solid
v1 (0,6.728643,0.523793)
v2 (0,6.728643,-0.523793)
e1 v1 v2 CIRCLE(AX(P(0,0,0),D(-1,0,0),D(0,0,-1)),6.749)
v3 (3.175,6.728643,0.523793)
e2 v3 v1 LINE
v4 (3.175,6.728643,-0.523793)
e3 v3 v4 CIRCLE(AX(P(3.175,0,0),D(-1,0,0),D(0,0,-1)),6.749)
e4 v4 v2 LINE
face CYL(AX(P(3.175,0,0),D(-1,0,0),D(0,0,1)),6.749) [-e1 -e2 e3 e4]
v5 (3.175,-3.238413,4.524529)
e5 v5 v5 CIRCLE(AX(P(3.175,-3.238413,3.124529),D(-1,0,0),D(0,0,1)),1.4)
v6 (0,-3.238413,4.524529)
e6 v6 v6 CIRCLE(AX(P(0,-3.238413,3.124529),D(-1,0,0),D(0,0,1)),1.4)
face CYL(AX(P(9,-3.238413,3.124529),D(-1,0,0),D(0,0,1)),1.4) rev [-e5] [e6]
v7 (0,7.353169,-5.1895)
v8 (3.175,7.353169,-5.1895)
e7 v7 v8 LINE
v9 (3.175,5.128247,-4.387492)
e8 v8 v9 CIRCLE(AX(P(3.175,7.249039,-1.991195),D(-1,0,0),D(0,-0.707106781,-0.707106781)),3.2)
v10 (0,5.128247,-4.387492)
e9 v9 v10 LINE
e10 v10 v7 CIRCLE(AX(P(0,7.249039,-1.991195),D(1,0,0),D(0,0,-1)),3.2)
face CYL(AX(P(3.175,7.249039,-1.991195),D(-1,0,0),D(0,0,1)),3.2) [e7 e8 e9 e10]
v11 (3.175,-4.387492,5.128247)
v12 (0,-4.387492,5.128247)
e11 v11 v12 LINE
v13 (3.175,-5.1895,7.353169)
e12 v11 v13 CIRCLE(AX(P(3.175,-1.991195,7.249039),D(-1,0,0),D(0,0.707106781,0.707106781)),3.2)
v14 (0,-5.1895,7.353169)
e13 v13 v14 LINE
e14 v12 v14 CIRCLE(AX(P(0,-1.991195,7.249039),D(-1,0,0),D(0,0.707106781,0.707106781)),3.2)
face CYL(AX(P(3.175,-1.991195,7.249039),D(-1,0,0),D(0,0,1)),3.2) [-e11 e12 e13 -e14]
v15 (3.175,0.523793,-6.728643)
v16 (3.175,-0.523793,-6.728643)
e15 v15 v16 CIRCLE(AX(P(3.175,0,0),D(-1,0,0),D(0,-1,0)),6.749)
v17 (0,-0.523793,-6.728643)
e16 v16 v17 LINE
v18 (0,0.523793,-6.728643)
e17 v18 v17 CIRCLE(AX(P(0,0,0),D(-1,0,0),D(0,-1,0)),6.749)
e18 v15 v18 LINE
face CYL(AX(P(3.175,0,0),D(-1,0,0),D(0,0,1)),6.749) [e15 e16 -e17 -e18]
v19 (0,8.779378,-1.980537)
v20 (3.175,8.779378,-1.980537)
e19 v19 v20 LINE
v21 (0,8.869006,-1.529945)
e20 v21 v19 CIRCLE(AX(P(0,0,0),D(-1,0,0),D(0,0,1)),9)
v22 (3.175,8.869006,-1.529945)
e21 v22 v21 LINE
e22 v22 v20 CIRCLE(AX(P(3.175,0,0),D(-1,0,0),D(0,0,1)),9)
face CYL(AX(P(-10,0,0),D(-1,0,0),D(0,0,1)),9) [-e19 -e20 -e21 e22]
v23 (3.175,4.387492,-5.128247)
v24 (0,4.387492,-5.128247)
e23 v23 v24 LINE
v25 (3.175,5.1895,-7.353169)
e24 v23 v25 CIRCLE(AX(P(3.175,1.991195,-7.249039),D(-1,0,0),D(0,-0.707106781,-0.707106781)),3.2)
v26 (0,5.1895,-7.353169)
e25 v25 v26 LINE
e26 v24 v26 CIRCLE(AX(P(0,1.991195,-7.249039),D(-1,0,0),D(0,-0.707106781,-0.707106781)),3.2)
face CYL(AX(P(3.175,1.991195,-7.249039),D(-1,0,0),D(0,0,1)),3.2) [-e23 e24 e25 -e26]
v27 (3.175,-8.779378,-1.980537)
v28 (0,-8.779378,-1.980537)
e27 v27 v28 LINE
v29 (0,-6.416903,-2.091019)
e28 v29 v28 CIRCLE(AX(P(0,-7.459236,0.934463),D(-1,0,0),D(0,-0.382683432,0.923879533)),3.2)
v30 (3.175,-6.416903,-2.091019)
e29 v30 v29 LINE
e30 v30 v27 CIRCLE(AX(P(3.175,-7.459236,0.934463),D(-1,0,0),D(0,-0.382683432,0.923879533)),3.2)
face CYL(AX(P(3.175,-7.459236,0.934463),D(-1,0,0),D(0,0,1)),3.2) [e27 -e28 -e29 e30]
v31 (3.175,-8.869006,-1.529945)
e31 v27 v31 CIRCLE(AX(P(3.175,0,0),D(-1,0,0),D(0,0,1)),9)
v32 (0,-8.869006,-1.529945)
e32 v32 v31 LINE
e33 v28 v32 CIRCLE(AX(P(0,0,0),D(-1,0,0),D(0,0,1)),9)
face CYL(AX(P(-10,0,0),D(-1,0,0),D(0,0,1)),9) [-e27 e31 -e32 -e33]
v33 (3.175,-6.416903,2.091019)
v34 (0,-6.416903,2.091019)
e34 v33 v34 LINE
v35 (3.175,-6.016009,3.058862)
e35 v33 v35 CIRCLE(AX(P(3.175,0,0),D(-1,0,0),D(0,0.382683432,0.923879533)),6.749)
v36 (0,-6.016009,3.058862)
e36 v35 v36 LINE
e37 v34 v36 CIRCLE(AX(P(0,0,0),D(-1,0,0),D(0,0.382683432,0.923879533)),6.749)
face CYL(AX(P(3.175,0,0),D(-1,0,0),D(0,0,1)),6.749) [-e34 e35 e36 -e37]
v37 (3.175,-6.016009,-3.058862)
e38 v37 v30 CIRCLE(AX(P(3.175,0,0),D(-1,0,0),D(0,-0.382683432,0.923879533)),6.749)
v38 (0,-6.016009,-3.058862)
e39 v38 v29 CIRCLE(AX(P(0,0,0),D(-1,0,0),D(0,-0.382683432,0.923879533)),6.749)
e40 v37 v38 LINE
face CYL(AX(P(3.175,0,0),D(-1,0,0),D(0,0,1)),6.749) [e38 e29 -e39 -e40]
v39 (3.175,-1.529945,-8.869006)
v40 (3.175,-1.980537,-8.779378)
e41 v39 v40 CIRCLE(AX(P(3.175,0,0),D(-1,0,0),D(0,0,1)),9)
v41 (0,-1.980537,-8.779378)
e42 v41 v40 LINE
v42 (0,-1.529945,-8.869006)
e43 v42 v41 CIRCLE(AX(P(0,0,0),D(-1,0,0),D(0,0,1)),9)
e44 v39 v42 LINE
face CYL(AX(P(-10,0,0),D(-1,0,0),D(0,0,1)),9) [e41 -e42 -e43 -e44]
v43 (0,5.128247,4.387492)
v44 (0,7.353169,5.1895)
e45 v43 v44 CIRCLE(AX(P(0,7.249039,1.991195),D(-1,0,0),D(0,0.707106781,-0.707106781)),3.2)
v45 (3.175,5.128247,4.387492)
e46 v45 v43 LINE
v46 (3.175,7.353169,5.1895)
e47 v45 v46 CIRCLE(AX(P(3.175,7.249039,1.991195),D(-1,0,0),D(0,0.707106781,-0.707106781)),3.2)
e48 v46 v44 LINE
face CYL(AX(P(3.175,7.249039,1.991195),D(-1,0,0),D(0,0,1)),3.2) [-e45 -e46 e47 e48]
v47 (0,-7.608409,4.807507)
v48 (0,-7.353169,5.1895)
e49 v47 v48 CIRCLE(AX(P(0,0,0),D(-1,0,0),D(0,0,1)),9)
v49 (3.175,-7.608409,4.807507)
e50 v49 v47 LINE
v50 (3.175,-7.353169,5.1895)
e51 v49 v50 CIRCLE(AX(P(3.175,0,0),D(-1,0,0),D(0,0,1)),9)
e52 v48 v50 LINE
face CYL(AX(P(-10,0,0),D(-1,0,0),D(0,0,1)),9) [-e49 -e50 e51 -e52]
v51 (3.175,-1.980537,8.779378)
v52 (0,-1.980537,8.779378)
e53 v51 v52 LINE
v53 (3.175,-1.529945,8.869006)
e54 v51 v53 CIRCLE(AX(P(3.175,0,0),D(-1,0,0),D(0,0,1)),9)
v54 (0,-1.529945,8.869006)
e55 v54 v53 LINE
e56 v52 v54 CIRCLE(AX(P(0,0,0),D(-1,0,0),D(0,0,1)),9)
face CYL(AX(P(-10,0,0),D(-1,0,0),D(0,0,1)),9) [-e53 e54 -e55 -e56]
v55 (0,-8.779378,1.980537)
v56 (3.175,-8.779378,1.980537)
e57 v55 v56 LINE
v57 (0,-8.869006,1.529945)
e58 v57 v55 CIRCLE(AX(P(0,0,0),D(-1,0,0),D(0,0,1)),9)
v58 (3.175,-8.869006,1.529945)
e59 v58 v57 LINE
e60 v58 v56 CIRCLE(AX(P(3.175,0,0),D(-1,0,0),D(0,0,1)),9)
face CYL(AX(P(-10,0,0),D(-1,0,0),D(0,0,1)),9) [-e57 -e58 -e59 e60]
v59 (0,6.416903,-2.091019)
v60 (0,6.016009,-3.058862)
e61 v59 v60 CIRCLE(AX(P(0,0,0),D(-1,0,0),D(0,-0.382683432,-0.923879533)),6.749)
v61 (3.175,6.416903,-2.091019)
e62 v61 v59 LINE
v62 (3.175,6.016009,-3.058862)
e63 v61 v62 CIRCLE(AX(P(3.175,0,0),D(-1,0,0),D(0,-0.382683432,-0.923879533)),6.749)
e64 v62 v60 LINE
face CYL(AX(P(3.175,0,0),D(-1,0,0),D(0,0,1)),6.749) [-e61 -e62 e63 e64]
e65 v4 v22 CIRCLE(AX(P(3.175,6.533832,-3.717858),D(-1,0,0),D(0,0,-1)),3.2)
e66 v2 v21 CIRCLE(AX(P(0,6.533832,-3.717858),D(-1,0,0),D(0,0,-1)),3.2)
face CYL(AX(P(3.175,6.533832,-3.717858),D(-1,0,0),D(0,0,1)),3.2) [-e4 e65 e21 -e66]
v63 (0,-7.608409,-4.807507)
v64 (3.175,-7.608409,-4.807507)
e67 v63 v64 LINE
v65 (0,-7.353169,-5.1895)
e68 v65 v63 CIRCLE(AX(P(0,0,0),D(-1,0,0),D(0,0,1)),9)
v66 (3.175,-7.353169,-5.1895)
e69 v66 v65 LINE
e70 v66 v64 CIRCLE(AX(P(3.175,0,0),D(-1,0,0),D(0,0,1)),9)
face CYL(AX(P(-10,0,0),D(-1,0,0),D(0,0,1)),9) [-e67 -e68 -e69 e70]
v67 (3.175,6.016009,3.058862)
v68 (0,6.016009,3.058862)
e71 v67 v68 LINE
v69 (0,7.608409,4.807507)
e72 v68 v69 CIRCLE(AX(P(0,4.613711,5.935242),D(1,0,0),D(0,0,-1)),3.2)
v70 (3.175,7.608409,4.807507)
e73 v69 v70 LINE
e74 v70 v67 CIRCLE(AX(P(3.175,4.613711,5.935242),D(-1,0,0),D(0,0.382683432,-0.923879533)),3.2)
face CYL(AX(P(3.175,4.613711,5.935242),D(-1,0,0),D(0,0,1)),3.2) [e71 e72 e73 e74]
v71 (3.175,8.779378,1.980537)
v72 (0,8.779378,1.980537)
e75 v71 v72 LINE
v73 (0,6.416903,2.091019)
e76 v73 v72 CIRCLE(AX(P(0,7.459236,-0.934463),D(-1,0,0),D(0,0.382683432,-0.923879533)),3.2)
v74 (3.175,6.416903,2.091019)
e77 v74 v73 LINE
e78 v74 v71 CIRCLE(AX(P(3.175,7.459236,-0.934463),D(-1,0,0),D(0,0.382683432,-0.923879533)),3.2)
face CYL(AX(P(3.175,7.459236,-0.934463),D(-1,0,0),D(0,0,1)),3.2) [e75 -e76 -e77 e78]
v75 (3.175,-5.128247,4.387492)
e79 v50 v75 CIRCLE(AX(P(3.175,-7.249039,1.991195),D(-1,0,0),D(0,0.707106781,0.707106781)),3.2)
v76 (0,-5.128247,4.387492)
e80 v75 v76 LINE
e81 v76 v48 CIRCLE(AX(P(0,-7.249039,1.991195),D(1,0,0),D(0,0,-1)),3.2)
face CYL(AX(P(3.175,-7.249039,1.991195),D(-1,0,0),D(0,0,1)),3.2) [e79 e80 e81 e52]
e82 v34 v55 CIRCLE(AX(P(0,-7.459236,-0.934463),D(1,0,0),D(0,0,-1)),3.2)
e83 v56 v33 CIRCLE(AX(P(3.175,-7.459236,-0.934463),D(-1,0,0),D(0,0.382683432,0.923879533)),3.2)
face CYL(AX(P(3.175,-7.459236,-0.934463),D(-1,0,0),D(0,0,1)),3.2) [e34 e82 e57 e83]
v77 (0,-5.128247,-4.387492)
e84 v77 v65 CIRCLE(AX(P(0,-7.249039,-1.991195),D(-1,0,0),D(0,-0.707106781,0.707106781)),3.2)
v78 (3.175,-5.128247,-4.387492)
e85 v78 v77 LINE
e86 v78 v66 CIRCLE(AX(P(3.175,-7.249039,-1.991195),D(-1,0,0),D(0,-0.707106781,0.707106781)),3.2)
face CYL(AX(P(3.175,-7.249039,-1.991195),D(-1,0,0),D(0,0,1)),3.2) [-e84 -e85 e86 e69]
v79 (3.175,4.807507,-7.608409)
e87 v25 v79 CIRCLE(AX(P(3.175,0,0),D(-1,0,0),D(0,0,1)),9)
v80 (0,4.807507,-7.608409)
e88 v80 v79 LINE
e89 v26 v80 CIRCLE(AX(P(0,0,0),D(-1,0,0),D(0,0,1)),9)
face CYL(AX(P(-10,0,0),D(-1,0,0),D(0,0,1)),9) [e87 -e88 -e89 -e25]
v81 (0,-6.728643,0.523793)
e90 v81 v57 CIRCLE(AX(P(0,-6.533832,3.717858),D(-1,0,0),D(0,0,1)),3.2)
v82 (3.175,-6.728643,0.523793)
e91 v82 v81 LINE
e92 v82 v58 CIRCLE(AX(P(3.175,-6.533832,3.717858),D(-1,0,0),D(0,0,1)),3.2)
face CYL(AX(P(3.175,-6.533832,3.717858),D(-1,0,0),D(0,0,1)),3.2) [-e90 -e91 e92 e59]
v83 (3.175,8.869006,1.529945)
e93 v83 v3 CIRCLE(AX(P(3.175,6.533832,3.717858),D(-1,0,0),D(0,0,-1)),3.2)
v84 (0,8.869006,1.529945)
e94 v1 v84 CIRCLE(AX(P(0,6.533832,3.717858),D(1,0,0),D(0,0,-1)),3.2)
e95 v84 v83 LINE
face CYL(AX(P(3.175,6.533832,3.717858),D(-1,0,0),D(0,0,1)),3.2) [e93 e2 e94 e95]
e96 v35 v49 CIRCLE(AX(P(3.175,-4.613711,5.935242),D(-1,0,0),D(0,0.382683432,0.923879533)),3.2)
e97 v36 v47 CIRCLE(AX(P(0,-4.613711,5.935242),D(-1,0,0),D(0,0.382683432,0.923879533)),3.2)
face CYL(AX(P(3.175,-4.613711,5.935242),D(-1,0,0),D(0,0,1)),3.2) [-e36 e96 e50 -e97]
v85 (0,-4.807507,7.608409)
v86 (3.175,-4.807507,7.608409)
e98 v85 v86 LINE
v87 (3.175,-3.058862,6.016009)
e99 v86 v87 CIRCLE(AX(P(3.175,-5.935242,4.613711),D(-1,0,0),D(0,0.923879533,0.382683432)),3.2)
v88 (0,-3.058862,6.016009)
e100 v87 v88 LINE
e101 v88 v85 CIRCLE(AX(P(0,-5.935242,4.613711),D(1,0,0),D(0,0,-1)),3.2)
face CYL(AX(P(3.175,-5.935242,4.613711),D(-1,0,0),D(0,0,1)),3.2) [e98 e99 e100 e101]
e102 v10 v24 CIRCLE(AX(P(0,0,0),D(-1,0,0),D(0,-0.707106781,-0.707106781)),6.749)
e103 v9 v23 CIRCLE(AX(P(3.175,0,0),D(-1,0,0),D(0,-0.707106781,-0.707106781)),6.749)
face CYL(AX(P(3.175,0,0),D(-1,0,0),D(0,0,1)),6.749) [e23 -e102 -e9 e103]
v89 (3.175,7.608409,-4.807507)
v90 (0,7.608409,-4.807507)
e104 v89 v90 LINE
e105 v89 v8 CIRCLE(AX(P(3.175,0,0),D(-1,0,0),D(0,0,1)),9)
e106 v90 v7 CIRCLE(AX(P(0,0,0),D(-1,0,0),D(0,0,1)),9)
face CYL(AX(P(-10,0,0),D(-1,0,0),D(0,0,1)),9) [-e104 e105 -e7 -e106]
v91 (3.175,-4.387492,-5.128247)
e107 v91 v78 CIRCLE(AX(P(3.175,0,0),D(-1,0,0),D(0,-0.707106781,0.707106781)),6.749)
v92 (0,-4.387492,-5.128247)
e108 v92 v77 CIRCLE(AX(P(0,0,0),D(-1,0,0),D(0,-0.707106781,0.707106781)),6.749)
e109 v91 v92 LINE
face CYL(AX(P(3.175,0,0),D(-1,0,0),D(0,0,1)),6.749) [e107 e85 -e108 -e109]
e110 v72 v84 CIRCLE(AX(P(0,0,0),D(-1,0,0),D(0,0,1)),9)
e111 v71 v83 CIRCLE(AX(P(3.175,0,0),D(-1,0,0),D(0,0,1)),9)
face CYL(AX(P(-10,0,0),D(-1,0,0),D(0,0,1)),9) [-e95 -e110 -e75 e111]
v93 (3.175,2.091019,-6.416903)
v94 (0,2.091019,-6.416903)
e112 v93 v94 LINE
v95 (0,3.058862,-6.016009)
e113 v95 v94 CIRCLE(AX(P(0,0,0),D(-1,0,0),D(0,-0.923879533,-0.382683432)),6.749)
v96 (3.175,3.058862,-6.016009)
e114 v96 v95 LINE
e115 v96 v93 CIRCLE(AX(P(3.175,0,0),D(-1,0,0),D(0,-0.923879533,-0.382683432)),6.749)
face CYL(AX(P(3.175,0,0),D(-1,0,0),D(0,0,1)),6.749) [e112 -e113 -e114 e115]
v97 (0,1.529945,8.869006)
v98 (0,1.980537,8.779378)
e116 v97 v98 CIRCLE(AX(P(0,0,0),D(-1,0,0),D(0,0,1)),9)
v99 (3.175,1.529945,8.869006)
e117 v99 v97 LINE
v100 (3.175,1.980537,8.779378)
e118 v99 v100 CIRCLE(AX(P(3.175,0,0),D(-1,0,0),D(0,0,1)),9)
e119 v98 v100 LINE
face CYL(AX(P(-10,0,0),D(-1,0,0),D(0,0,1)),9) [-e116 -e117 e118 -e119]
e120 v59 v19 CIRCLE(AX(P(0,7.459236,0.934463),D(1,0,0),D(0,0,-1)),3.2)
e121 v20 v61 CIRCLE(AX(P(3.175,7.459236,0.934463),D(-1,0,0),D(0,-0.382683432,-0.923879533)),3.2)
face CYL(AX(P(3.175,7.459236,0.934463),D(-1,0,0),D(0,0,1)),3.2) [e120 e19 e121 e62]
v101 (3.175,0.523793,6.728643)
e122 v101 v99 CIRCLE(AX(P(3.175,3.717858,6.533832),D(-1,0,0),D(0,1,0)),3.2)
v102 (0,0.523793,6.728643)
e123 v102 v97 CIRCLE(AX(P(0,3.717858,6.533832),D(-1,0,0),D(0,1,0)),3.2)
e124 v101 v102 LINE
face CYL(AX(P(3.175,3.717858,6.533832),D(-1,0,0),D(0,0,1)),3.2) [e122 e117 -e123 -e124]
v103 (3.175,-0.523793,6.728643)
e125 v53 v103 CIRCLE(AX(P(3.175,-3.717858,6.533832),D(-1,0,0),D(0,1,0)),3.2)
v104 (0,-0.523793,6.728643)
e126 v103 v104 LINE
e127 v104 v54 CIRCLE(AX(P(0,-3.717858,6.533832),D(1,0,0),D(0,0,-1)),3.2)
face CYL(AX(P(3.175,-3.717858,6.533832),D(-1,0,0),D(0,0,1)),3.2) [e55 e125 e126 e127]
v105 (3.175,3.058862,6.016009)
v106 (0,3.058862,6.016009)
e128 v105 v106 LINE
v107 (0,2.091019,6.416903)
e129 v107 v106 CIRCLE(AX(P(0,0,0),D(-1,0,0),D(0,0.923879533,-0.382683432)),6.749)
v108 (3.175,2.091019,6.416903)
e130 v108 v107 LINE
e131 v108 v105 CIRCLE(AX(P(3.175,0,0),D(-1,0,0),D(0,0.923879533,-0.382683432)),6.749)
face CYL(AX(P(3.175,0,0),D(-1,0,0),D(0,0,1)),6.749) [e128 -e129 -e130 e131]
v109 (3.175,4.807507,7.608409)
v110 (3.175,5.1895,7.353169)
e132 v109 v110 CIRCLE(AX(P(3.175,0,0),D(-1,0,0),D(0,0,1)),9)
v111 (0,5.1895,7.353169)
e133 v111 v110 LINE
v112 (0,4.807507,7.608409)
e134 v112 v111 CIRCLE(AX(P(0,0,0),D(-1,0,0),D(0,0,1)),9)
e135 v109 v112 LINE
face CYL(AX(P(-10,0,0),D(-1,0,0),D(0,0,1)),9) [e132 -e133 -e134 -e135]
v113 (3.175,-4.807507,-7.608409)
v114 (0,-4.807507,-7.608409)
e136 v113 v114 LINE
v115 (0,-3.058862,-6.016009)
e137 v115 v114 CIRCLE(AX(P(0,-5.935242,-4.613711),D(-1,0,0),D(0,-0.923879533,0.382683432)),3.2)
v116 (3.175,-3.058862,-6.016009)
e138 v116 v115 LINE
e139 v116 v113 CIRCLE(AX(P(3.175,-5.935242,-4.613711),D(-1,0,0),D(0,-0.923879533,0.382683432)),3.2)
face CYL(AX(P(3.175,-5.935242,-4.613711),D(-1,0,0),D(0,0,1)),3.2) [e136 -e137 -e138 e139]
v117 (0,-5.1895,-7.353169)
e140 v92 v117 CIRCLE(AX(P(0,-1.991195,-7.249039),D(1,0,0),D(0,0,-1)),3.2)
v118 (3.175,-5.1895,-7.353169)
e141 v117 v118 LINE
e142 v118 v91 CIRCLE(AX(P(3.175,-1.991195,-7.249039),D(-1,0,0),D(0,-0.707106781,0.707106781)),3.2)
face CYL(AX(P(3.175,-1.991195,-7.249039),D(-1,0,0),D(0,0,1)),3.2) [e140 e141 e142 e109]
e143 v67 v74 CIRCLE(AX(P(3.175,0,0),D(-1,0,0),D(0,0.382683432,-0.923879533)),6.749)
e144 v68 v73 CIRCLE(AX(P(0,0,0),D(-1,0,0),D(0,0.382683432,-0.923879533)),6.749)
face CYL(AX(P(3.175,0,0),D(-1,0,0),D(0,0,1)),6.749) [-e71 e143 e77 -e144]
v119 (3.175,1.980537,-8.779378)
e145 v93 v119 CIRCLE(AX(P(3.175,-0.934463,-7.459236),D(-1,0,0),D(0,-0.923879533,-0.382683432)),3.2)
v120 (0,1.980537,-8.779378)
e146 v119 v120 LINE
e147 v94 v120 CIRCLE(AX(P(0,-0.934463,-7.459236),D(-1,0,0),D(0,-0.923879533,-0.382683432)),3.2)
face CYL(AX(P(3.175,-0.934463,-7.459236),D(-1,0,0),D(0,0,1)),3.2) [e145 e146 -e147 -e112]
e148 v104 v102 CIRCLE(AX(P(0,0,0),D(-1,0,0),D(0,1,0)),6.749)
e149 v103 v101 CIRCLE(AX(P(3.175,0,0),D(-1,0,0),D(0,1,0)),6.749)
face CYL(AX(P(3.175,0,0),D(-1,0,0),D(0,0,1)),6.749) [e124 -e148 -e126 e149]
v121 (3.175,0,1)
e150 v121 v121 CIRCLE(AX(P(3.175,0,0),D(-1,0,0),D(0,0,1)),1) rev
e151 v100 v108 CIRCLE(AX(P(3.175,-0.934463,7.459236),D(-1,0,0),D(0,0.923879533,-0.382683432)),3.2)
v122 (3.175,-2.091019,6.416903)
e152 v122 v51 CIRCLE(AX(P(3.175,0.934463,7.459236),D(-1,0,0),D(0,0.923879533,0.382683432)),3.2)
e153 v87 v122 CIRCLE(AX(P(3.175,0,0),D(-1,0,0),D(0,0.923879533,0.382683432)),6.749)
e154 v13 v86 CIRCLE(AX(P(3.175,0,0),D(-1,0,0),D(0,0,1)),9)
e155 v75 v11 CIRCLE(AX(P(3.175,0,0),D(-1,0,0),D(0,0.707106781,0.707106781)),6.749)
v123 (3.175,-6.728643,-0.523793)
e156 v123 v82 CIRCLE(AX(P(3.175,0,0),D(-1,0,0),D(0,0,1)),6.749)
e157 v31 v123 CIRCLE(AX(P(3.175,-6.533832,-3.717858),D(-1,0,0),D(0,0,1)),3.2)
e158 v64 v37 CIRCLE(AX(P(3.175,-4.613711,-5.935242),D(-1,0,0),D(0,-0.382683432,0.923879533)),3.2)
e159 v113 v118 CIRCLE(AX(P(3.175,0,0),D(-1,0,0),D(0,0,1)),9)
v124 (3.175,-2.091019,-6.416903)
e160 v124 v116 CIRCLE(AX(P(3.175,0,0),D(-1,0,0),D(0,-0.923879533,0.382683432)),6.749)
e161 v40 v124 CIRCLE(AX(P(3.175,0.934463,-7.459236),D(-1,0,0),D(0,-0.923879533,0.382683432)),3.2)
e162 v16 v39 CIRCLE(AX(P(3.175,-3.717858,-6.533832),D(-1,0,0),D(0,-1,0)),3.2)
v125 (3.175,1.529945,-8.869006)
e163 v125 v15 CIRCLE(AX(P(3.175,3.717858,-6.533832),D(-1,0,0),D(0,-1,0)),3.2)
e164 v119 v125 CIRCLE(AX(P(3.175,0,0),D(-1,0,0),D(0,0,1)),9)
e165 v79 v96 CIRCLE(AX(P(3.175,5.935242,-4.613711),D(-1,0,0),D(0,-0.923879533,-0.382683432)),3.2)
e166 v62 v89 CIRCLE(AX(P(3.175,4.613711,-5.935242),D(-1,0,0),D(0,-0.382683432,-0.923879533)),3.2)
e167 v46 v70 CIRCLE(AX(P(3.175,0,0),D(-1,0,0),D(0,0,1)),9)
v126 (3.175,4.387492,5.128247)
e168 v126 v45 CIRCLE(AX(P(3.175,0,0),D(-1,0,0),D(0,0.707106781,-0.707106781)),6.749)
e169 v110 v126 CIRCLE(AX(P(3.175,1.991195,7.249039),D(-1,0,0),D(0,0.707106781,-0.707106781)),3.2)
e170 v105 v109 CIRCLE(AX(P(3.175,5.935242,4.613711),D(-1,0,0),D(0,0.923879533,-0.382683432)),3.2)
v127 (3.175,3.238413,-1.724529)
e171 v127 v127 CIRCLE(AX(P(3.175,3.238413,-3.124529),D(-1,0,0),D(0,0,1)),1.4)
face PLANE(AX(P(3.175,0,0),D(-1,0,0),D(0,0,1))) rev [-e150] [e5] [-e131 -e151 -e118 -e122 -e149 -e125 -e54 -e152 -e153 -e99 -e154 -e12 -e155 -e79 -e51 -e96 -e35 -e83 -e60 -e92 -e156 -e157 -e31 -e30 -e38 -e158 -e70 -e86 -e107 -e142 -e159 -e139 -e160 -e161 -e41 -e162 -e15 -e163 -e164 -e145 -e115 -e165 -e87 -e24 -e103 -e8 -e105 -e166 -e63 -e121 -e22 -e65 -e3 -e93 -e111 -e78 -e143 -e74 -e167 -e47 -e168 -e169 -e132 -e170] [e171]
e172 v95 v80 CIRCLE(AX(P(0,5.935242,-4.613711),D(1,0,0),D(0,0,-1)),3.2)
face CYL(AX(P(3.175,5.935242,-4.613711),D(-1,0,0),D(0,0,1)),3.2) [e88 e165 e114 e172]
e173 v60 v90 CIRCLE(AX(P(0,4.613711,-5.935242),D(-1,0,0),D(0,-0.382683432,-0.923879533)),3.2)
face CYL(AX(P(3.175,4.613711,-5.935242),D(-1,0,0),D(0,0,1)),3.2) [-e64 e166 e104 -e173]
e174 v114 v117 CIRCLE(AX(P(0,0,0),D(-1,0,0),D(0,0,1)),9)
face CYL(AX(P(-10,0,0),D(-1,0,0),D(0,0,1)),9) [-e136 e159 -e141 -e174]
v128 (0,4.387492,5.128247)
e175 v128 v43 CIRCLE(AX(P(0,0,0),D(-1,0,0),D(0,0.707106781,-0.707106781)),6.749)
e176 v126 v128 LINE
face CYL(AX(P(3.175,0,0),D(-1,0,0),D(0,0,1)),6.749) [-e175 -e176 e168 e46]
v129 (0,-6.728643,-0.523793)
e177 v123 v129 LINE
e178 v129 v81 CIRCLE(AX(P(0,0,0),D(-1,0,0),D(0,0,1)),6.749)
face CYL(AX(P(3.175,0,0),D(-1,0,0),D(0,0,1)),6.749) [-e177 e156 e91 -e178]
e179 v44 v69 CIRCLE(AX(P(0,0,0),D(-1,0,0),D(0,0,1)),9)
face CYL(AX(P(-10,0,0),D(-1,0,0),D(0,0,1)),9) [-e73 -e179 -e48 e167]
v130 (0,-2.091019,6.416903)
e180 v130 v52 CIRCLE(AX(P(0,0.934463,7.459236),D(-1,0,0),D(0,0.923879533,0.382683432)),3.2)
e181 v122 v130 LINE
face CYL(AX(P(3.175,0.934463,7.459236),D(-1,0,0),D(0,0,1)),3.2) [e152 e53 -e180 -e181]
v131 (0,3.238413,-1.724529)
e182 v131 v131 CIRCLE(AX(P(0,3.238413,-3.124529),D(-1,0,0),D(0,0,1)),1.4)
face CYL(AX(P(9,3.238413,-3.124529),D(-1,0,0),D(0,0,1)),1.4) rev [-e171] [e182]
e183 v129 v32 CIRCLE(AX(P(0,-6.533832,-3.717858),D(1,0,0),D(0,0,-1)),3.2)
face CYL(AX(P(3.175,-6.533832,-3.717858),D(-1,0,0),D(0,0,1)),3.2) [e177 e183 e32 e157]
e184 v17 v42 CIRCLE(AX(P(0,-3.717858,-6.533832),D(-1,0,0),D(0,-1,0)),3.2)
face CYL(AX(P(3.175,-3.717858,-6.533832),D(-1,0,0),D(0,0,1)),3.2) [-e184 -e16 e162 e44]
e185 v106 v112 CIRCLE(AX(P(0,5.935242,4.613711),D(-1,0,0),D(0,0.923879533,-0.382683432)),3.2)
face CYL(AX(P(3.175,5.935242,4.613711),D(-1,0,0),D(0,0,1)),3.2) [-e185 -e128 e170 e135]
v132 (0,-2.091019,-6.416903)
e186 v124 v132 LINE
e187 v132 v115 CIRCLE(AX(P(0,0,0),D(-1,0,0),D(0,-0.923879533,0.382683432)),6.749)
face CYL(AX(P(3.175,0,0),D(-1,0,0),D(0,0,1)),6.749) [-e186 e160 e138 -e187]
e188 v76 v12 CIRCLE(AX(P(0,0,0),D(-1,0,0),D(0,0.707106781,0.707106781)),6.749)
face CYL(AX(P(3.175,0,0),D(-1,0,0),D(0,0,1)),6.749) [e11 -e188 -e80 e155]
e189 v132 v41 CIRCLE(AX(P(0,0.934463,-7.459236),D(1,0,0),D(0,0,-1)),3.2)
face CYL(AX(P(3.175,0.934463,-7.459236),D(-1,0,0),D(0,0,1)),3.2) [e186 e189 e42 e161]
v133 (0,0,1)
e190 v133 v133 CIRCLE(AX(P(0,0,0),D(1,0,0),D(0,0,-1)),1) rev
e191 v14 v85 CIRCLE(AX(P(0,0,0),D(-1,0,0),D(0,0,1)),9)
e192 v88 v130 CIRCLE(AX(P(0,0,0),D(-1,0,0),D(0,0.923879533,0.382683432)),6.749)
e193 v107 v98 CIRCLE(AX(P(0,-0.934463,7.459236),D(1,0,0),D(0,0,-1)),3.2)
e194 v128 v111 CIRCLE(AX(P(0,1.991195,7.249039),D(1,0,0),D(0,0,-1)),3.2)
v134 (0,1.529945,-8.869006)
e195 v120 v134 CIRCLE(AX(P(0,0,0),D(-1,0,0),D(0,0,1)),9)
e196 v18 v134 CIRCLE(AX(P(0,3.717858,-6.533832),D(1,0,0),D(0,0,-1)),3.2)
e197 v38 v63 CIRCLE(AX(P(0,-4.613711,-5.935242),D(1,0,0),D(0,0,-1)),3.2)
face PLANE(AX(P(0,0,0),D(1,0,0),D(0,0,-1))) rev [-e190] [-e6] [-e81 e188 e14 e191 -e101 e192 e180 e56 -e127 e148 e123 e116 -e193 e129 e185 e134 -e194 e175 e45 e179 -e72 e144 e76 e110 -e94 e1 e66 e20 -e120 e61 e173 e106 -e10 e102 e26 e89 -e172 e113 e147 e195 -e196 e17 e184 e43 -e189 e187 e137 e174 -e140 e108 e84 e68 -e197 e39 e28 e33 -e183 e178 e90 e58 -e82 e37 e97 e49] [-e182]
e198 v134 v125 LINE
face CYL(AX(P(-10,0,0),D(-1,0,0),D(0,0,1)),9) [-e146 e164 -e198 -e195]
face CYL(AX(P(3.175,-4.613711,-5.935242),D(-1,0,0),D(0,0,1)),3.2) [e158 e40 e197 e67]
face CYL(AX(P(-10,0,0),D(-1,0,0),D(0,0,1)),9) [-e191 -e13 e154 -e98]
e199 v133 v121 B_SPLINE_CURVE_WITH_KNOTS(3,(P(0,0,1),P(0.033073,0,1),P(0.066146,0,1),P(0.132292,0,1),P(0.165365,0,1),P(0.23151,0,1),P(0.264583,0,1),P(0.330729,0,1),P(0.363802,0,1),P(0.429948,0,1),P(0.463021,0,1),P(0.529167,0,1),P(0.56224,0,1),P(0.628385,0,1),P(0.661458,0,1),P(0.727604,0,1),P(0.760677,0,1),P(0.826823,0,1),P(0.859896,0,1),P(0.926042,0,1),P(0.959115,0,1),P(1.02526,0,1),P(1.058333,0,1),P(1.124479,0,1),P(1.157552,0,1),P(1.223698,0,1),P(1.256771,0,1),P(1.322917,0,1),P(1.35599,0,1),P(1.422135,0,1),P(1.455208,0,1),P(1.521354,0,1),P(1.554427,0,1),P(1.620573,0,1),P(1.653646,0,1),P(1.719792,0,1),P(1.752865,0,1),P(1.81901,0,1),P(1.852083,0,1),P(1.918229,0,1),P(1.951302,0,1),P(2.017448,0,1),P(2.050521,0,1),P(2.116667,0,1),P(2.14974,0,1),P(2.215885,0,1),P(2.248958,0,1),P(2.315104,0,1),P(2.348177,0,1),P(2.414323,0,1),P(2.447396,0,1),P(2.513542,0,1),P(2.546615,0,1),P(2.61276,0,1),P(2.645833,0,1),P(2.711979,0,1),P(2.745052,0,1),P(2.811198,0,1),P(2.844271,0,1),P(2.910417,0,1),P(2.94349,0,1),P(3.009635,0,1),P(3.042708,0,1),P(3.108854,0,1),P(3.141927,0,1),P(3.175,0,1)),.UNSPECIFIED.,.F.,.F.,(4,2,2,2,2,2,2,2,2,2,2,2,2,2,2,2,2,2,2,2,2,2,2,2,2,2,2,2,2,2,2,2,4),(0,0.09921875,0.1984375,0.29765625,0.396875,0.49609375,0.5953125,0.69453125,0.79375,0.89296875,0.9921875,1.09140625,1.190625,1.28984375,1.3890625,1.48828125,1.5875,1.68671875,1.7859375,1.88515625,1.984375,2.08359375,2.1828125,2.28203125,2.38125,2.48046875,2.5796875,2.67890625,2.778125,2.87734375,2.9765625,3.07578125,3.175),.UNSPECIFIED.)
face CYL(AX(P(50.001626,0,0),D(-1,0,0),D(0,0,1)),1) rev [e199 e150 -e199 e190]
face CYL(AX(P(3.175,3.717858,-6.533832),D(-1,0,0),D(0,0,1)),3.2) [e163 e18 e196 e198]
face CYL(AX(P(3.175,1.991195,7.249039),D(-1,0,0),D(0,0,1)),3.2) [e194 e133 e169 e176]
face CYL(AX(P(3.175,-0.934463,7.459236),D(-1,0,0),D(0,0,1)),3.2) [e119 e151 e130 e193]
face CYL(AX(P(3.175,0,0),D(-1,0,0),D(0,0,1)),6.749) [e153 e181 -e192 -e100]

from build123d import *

# Parameters (mm, degrees)
BASPROSKE_W            = 3.175
BASPROSKE_H            = 9
TOOTHCUT_DEPTH         = 14.117950488
TEETHCUTS_COUNT        = 16
TEETHCUTS_ANGLE        = 337.5
BORSKE_R               = 1
BORE_DEPTH             = 50.0016256
CUT_EXTRUDE2_START     = -3.175
CUT_EXTRUDE2_OUTLINE_R = 1.4
CUT_EXTRUDE2_DEPTH     = 3.175


# Read off the part's stored shape, not the designer's step: Cut-Extrude2
with BuildPart() as part:
    # BasProSke → Base-Revolve (revolve)
    with BuildSketch(Plane(origin=(0, 0, 0), x_dir=(1, 0, 0), z_dir=(0, 1, 0)), mode=Mode.PRIVATE) as base_revolve_sk:
        with Locations((1.5875, 4.5)):
            Rectangle(BASPROSKE_W, BASPROSKE_H)
    revolve(base_revolve_sk.sketch.rotate(Axis((-10, 0, 0), (1, 0, 0)), 180), axis=Axis((-10, 0, 0), (1, 0, 0)))

    # TooCutSke → ToothCut (cut, through all)
    with BuildSketch(Plane(origin=(0, 0, 0), x_dir=(0, 0, -1), z_dir=(1, 0, 0))):
        with BuildLine():
            ThreePointArc((0.523792937, 6.728643397), (0, 6.749), (-0.523792937, 6.728643397))
            ThreePointArc((-0.523792937, 6.728643397), (-0.828704482, 7.90962059), (-1.553355277, 8.890721711))
            ThreePointArc((-1.553355277, 8.890721711), (0, 9.0254), (1.553355277, 8.890721711))
            ThreePointArc((1.553355277, 8.890721711), (0.828704482, 7.90962059), (0.523792937, 6.728643397))
        make_face()
    toothcut = extrude(amount=TOOTHCUT_DEPTH, mode=Mode.SUBTRACT)

    # TeethCuts: ToothCut ×16 about axis
    teethcuts_axis = Axis((-10, 0, 0), (1, 0, 0))
    for i in range(1, TEETHCUTS_COUNT):
        add(toothcut.rotate(teethcuts_axis, i * TEETHCUTS_ANGLE / (TEETHCUTS_COUNT - 1)), mode=Mode.SUBTRACT)

    # BorSke → Bore (cut, symmetric)
    with BuildSketch(Plane(origin=(0, 0, 0), x_dir=(0, 0, -1), z_dir=(1, 0, 0))):
        with Locations(Location((0, 0, 0), (0, 0, 180))):
            Circle(BORSKE_R)
    extrude(amount=BORE_DEPTH, both=True, mode=Mode.SUBTRACT)

    # Cut-Extrude2 outline → Cut-Extrude2 (cut)
    with BuildSketch(Plane(origin=(0, 0.498479729, -127.163742786), x_dir=(0, -0.6257802276580691, -0.779999427353774), z_dir=(-1, 0, 0)).offset(CUT_EXTRUDE2_START)):
        with Locations((-98.465111461, 75.484141115)):
            Circle(CUT_EXTRUDE2_OUTLINE_R)
        with Locations((-99.286304129, 84.446598512)):
            Circle(CUT_EXTRUDE2_OUTLINE_R)
    extrude(amount=CUT_EXTRUDE2_DEPTH, mode=Mode.SUBTRACT)


solid = part.part
